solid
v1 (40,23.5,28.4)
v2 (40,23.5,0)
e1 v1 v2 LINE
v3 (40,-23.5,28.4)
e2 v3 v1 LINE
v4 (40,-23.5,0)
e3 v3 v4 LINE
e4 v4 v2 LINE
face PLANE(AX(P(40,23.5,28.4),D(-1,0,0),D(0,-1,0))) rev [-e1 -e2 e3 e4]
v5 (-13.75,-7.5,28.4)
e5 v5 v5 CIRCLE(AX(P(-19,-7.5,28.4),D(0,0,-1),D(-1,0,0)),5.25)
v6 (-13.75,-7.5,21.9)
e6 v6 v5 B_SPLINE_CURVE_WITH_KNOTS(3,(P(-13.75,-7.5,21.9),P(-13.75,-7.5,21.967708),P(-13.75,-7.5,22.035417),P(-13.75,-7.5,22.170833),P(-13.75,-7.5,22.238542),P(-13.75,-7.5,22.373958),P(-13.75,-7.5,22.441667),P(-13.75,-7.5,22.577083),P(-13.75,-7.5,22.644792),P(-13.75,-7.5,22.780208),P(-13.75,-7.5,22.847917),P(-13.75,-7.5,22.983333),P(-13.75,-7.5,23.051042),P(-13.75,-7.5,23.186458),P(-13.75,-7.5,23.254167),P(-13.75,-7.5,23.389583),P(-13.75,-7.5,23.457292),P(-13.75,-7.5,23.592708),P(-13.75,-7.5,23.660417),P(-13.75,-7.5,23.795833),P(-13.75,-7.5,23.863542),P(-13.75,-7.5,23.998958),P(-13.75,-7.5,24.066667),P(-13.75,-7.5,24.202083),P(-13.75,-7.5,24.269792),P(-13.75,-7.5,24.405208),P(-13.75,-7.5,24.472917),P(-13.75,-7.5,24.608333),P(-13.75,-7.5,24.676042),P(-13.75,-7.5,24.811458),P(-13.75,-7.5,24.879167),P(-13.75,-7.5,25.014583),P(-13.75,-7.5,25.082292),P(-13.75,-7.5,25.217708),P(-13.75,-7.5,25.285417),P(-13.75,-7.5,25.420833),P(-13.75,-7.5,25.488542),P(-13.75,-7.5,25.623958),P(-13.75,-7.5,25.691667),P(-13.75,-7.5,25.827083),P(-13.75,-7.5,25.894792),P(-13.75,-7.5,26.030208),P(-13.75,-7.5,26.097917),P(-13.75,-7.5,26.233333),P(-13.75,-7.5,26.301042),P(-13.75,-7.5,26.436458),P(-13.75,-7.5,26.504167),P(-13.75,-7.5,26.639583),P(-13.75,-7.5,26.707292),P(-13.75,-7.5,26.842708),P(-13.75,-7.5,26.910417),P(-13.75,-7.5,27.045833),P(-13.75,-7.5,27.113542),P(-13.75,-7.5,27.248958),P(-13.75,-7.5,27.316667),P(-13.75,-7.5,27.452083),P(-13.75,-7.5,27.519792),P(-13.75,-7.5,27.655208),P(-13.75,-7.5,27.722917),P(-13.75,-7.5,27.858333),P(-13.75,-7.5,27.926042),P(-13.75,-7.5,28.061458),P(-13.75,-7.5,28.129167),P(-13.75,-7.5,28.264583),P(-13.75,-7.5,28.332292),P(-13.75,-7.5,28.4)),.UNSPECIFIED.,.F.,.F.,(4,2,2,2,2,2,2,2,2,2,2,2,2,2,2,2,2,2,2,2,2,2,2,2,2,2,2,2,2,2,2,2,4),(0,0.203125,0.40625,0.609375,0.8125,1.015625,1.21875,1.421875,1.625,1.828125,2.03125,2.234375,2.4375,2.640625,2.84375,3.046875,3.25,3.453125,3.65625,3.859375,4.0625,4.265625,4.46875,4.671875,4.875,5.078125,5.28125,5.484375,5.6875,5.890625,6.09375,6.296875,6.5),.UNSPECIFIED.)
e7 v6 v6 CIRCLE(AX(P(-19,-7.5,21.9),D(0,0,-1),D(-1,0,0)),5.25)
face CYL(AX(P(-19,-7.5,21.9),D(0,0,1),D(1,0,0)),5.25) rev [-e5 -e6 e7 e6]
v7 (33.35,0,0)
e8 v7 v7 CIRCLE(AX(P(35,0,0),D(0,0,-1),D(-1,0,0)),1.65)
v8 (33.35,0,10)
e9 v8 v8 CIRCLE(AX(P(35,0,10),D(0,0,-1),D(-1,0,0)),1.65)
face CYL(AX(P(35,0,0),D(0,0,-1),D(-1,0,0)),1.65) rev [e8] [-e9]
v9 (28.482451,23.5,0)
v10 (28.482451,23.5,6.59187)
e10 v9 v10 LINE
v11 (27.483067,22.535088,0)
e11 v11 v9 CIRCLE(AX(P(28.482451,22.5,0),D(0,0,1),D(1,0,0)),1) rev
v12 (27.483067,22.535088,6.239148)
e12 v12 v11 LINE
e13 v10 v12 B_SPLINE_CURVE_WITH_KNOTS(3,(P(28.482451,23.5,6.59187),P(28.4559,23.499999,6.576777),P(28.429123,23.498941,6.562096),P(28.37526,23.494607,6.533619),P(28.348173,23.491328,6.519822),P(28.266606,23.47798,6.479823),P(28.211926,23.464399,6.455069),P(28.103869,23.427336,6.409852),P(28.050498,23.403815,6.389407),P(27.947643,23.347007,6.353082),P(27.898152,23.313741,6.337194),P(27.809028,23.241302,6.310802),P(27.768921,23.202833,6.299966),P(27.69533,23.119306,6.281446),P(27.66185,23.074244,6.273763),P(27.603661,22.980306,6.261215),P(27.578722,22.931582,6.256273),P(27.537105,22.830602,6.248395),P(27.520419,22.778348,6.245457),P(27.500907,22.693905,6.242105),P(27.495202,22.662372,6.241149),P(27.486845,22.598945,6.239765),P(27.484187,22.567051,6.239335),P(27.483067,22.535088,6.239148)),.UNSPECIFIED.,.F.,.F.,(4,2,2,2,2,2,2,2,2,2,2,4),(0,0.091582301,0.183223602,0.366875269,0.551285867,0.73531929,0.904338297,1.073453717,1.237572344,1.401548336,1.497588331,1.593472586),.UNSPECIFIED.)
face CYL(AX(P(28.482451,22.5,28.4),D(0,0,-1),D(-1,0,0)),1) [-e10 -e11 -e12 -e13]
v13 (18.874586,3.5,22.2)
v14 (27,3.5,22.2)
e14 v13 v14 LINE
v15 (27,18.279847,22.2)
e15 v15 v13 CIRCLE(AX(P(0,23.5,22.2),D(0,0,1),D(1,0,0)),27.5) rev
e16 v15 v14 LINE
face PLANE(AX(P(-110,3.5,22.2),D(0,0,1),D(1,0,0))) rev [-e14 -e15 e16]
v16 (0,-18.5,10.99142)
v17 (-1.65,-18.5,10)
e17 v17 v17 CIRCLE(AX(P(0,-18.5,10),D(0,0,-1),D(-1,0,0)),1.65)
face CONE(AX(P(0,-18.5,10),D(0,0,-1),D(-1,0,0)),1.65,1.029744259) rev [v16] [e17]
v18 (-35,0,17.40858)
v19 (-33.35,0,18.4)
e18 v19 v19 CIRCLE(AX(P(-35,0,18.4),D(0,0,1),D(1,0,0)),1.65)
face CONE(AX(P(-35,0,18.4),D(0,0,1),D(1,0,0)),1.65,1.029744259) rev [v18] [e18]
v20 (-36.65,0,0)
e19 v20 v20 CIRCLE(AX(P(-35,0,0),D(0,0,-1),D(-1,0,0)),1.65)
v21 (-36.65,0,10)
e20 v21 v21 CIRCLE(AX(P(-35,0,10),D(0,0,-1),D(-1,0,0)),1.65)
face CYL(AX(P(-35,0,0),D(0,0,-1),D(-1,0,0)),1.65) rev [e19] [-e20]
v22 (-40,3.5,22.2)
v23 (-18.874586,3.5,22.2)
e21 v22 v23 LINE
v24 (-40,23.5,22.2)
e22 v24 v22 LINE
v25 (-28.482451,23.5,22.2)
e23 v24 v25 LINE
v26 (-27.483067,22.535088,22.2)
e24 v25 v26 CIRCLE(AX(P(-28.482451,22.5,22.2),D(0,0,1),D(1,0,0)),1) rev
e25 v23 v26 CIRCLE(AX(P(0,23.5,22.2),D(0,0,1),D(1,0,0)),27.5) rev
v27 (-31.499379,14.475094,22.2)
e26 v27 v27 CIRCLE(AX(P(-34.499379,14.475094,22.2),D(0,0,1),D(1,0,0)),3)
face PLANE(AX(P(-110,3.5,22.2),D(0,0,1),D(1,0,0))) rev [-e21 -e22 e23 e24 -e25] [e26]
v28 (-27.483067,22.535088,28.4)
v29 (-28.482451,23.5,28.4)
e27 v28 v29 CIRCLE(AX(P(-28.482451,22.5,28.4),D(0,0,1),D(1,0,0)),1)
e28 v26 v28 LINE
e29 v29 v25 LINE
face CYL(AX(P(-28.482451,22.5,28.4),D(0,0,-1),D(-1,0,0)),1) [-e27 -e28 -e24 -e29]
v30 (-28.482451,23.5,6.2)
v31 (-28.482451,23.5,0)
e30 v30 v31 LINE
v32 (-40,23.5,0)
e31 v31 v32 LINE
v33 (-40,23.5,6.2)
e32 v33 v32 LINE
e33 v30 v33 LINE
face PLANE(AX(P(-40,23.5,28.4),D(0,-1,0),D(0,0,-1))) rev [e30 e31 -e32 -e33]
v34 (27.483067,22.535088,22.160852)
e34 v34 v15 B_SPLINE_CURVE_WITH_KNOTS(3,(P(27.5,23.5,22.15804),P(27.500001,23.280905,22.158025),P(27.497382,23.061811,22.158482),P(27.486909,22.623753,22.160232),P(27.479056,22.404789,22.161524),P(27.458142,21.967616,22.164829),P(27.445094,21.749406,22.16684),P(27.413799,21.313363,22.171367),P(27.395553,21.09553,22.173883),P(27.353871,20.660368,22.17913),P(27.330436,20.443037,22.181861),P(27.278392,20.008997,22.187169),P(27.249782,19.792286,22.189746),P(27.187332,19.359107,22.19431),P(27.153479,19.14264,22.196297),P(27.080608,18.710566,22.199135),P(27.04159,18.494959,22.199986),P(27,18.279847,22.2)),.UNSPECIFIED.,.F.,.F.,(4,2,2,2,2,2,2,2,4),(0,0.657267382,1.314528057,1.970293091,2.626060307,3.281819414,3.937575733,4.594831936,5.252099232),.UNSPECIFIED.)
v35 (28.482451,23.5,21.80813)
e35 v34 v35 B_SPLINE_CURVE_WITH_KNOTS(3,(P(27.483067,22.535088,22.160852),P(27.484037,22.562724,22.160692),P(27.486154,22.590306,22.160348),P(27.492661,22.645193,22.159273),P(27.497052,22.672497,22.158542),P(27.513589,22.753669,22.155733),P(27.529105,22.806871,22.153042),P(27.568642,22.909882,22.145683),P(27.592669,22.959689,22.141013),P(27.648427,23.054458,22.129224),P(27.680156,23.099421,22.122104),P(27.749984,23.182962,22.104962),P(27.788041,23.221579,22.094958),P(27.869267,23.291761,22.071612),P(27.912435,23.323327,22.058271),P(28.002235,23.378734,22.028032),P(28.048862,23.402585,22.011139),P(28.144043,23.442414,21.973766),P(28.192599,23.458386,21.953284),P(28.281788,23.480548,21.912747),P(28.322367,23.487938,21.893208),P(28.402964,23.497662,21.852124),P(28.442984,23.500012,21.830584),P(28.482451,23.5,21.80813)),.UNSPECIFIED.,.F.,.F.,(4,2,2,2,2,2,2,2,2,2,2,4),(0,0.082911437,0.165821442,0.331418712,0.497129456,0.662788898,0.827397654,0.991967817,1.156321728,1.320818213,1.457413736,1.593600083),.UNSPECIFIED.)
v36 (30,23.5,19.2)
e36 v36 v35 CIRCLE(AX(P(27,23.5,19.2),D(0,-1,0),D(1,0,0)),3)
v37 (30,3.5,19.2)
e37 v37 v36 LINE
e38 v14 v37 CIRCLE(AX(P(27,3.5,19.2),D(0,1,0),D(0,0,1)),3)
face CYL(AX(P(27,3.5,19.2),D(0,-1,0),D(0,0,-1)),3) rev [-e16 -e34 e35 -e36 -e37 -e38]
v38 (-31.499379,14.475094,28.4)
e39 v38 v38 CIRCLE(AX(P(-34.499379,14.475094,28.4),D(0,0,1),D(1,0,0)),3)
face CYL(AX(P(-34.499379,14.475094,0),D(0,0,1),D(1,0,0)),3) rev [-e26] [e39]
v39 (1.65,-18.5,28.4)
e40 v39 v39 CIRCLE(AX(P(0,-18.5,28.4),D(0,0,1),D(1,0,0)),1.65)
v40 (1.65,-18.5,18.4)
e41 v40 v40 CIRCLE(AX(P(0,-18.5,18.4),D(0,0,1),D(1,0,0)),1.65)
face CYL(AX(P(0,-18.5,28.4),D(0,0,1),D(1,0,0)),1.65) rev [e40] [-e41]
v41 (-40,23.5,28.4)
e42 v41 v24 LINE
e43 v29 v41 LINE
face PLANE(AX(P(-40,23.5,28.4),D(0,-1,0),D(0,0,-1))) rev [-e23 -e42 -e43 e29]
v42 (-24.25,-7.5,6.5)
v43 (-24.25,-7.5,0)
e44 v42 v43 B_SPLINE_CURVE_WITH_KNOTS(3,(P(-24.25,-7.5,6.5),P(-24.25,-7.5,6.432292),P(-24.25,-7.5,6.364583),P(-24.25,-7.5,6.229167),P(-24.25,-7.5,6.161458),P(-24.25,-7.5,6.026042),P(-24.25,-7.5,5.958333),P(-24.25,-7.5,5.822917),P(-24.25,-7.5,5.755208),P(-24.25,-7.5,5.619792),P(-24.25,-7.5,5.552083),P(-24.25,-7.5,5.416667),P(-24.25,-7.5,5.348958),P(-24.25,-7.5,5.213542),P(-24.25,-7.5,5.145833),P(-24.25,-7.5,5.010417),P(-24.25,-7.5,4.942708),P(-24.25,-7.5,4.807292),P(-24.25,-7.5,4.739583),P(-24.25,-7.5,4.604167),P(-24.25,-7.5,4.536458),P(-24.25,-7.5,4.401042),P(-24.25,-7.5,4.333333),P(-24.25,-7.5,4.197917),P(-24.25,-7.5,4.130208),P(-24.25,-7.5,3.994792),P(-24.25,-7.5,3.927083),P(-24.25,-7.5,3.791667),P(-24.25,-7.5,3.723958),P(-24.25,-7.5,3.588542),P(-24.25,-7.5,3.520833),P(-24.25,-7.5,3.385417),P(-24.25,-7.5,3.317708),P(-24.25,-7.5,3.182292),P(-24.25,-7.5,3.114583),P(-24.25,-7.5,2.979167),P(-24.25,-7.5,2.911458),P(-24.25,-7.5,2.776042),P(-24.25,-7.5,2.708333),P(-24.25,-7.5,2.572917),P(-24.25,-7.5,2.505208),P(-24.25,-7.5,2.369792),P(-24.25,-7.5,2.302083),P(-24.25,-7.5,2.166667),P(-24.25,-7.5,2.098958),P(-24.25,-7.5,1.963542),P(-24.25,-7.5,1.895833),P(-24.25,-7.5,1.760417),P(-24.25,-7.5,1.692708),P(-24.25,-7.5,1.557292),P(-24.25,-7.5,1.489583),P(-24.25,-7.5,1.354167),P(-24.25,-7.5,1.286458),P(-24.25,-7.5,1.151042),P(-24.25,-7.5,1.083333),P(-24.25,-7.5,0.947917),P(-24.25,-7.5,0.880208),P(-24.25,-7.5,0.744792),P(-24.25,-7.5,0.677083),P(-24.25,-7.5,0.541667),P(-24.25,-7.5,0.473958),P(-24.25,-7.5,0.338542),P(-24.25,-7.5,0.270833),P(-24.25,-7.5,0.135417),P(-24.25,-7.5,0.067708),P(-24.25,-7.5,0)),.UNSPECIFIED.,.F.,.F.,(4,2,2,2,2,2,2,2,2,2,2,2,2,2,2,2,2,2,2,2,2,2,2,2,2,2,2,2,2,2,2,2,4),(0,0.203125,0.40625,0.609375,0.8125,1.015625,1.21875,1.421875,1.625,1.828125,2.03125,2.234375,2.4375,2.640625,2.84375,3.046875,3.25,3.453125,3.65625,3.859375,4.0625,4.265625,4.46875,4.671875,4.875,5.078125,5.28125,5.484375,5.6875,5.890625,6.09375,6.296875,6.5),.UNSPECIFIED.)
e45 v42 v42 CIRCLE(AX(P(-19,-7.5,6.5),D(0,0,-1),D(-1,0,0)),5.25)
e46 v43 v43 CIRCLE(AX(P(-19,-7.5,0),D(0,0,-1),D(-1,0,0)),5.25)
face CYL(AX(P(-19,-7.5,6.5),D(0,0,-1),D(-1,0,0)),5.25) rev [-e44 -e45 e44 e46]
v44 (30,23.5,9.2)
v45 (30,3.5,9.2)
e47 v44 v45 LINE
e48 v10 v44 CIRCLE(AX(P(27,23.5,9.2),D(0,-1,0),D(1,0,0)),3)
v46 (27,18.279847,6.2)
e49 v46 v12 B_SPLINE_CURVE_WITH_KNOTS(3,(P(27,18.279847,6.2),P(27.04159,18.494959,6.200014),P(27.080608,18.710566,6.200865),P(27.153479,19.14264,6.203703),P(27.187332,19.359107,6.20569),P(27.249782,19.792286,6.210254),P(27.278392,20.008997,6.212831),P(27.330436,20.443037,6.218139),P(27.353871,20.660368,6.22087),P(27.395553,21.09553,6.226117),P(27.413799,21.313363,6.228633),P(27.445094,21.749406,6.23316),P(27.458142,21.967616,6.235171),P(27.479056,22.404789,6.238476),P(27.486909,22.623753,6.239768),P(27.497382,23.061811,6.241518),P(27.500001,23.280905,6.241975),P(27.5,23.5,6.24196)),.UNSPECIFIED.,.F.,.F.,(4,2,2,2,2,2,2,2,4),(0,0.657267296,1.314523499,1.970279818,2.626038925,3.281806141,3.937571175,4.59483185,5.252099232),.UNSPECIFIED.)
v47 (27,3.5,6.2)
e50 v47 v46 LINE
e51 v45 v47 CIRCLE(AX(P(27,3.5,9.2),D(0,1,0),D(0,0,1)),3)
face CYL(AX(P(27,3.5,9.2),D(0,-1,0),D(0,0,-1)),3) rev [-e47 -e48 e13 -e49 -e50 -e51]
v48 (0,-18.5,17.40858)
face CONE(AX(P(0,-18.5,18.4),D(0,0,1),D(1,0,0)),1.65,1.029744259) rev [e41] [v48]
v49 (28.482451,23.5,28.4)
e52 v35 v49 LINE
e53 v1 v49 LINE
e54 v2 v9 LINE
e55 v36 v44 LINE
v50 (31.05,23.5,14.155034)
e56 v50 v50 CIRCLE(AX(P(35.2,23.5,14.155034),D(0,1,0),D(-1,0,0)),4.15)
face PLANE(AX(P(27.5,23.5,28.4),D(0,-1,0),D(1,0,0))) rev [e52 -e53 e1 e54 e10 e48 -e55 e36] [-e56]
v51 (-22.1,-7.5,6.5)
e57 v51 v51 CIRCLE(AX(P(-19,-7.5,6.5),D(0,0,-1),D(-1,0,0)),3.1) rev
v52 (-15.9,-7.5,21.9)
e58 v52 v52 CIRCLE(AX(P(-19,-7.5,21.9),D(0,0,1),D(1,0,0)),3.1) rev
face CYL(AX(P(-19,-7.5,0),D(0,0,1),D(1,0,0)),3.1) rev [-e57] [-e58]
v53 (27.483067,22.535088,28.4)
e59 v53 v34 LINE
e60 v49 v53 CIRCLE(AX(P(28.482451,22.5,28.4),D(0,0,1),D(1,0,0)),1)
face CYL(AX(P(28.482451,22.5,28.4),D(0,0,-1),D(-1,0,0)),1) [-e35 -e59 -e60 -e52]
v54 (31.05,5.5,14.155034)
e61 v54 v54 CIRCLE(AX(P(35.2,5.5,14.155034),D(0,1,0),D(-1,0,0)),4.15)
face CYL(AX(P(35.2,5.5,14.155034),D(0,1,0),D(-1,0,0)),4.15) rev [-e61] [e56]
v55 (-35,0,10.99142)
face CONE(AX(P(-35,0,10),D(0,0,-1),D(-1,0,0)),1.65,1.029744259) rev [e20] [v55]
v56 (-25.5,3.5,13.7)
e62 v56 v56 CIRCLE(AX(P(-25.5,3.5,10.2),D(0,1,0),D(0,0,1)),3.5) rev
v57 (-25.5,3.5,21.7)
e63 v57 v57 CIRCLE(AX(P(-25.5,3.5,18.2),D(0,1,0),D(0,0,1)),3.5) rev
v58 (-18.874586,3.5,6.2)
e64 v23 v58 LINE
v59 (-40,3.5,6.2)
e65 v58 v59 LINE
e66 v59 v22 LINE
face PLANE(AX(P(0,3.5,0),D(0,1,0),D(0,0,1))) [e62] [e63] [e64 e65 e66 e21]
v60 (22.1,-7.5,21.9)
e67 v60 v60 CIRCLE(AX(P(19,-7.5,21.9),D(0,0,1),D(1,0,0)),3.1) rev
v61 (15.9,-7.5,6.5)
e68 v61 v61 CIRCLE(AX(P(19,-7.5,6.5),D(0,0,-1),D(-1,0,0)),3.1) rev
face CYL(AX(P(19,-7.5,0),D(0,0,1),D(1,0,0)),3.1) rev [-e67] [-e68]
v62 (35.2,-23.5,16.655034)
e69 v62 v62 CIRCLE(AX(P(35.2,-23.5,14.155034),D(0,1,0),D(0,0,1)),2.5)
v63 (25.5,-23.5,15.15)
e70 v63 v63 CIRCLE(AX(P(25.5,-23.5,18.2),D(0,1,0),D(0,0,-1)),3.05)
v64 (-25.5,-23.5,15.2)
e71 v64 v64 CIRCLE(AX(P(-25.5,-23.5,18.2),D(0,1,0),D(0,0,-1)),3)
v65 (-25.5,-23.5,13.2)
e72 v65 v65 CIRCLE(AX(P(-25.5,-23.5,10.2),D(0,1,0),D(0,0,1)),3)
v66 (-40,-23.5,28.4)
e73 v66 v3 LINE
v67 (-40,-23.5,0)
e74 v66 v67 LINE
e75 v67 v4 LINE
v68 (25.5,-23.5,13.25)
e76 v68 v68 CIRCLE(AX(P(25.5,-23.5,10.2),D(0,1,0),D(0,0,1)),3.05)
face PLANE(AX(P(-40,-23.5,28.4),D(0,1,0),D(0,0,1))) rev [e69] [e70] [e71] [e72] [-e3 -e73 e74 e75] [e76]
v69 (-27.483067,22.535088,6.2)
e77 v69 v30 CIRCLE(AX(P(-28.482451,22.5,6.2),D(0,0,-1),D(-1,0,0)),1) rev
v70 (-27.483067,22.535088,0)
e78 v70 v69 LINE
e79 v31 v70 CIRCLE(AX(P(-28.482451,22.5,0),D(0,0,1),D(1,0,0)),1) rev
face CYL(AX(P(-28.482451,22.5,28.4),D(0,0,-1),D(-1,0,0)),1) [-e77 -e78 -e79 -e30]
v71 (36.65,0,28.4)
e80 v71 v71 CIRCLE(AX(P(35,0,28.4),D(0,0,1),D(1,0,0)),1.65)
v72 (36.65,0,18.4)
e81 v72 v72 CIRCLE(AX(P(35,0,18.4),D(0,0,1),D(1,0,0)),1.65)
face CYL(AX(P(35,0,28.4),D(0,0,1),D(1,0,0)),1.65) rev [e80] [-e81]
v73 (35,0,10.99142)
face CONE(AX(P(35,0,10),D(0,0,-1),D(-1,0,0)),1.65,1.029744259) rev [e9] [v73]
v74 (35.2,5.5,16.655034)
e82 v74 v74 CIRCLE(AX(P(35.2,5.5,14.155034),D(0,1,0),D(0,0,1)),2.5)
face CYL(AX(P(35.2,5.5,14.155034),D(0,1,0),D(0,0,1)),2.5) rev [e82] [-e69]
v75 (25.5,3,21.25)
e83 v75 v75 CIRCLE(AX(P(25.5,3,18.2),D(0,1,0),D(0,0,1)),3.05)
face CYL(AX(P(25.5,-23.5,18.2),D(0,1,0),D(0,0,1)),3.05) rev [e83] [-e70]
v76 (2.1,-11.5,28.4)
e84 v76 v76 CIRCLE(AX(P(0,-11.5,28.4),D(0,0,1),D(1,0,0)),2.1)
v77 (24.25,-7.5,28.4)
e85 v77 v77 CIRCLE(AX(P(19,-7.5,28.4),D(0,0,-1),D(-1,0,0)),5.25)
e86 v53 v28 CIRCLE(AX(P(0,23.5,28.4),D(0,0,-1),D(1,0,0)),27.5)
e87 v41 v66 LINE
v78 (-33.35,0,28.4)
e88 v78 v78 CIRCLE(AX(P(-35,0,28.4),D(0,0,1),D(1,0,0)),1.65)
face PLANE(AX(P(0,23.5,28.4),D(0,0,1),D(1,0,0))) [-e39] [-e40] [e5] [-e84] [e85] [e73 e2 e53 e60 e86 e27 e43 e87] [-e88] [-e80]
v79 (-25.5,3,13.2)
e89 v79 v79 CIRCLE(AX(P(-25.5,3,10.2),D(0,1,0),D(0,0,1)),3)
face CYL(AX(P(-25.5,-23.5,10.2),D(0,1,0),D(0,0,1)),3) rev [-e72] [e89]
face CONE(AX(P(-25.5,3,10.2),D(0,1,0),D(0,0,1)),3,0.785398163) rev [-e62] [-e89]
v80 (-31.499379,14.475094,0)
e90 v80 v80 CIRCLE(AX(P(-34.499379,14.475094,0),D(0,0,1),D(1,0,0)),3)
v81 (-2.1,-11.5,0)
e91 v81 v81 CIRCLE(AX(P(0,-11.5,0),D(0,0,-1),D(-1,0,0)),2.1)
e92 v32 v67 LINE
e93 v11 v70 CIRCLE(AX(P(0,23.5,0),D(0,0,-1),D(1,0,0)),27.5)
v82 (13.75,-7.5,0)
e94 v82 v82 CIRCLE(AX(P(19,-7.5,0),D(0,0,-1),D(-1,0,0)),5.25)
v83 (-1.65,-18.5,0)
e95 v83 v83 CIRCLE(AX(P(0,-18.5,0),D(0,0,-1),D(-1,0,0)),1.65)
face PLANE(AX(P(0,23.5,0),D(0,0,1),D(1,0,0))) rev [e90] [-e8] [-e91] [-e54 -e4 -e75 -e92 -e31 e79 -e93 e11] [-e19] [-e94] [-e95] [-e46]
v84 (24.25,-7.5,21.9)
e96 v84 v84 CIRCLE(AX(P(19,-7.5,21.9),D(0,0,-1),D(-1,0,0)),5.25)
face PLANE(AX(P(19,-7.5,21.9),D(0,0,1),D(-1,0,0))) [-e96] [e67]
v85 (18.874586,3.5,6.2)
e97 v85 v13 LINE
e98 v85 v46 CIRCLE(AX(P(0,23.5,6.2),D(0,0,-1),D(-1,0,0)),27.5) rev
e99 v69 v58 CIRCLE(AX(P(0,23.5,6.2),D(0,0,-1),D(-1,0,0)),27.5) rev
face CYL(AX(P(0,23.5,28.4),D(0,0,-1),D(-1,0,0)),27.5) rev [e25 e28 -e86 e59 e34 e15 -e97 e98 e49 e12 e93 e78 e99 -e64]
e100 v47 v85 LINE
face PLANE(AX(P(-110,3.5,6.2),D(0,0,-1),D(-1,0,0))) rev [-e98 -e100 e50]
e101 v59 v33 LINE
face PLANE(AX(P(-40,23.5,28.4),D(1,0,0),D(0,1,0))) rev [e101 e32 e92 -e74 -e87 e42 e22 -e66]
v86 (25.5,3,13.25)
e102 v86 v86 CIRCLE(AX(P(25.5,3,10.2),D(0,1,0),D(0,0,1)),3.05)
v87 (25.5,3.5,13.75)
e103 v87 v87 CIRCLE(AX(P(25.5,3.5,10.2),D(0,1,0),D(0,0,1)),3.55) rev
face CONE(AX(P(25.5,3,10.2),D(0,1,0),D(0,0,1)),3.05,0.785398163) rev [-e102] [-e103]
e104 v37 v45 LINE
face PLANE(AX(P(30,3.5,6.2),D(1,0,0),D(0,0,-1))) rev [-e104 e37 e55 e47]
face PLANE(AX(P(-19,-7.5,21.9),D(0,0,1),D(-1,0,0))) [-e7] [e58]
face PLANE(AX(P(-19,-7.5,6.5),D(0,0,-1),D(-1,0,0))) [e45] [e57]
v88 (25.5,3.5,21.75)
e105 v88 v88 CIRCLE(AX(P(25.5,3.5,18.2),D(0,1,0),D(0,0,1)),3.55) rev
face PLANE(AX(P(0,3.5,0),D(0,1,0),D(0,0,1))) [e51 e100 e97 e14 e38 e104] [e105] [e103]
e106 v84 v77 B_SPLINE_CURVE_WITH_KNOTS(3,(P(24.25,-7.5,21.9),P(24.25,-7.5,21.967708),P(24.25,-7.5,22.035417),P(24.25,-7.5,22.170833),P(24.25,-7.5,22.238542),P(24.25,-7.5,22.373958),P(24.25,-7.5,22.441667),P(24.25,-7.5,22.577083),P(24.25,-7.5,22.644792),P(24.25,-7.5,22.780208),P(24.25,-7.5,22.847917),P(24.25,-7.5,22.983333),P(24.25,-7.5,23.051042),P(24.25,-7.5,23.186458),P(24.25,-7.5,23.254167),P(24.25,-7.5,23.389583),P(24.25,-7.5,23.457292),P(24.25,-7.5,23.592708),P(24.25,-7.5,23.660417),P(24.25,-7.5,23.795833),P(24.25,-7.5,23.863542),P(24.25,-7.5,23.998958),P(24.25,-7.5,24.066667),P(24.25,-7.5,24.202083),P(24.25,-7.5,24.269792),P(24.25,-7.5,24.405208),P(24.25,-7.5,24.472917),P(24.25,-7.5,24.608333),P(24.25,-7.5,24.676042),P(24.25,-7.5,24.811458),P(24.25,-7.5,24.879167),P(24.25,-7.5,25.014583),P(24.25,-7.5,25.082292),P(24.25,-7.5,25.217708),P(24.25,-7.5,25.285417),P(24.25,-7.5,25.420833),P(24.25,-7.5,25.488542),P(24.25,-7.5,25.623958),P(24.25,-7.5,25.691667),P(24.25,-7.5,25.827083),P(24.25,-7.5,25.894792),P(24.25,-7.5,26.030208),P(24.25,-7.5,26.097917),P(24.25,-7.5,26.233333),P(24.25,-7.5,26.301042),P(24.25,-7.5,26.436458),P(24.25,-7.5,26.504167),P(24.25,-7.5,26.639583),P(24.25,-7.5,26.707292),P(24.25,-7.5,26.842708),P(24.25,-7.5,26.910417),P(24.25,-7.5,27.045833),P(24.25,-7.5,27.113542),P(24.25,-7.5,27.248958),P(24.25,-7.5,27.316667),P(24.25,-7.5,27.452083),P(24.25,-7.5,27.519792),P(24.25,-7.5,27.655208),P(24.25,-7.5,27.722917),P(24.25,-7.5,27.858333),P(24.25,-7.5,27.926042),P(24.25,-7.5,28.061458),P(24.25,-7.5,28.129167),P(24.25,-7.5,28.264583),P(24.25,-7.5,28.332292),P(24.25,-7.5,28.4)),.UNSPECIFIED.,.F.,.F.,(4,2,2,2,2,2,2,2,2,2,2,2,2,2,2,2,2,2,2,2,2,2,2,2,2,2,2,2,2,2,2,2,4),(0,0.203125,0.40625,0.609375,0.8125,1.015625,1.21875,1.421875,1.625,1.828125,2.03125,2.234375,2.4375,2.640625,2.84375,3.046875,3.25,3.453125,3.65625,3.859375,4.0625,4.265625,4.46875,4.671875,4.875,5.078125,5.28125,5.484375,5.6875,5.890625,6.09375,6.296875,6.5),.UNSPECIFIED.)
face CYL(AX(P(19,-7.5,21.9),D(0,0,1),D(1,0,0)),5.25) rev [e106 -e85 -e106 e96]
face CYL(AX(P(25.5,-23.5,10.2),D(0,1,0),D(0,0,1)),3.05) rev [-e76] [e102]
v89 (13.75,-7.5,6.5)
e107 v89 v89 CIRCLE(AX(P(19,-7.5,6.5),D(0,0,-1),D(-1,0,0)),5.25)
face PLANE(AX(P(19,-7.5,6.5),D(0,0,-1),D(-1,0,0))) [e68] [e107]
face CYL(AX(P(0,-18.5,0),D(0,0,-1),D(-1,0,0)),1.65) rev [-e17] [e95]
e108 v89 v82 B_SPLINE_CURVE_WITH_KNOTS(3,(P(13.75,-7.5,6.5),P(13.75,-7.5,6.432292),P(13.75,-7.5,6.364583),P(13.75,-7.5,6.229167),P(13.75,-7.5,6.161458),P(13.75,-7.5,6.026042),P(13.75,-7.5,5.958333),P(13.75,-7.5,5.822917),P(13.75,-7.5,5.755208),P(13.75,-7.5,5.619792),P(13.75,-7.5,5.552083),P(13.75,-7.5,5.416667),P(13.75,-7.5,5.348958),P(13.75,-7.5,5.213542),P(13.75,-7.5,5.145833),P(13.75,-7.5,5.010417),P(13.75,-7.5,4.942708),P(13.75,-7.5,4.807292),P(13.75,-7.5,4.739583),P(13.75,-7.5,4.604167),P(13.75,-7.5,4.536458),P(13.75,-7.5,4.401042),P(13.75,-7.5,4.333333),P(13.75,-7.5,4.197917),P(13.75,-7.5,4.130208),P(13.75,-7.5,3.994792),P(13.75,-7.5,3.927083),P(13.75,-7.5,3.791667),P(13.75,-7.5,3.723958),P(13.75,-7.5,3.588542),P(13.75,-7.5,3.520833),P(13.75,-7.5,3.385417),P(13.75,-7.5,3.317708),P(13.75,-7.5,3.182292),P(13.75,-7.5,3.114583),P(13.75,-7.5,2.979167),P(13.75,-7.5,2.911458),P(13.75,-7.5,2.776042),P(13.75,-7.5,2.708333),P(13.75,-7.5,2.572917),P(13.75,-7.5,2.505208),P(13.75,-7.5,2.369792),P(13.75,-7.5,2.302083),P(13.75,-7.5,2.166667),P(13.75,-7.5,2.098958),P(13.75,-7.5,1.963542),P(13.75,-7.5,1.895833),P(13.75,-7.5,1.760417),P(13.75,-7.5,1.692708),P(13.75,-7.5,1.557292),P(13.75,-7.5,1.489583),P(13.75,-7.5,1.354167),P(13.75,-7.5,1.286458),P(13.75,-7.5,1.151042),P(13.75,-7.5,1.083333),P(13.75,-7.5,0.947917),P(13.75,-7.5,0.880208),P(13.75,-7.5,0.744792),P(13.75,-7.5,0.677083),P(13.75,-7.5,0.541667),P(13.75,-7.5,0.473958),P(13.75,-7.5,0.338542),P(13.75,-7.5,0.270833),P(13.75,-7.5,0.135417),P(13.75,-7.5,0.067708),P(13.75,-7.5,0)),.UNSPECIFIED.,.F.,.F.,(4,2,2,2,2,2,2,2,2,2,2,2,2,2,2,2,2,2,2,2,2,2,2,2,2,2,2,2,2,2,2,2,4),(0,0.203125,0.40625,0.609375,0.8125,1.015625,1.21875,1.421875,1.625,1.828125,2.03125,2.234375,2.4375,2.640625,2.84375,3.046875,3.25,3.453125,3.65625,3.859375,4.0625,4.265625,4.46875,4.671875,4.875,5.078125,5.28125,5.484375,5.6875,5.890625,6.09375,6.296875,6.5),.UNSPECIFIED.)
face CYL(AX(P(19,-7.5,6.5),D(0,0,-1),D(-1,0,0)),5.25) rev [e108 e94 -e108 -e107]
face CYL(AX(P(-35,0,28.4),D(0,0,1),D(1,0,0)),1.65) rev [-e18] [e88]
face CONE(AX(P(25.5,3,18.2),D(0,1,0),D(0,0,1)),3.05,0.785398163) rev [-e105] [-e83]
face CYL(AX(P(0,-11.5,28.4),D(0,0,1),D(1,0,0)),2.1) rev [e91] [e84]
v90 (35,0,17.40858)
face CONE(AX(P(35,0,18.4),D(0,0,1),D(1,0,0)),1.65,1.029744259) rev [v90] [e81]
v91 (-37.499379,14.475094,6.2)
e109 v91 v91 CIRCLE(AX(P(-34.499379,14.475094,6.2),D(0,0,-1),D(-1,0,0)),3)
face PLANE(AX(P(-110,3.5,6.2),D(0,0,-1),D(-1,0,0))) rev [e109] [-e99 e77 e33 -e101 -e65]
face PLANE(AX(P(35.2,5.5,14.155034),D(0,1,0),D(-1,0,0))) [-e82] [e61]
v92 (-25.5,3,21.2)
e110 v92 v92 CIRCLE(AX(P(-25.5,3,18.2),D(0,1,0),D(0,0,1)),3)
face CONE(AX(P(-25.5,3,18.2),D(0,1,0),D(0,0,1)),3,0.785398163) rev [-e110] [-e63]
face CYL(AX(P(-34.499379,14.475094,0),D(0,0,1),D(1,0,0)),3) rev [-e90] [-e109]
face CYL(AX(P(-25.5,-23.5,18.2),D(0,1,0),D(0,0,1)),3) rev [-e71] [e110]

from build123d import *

# Parameters (mm, degrees)
EXTRUDE_1_DEPTH             = 28.4
SKETCH_2_W                  = 140
SKETCH_2_H                  = 16
CUT_EXTRUDE_1_DEPTH         = 20
FILLET_1_R                  = 3
SKETCH_3_R                  = 3
SKETCH_3_R_2                = 3.05
CUT_EXTRUDE_2_DEPTH         = 56.996071341
CHAMFER_1_SIZE              = 0.5
SKETCH_4_R                  = 3
CUT_EXTRUDE_3_DEPTH         = 55.394944713
SKETCH_7_R                  = 4.15
CUT_EXTRUDE_4_DEPTH         = 18
HOLE_WIZARD_M6_2_D          = 5
SKETCH_10_R                 = 3.1
CUT_EXTRUDE_5_DEPTH         = 55.394944713
HOLE_WIZARD_M5_1_D          = 4.2
HOLE_WIZARD_M5_1_DEPTH      = 14.4
HOLE_WIZARD_M5_1_TIP        = 1.2618073
HOLE_WIZARD_M5_2_D          = 4.2
HOLE_WIZARD_M5_2_DEPTH      = 14.4
HOLE_WIZARD_M5_2_TIP        = 1.2618073
FILLET_2_R                  = 1
SKETCH_17_R                 = 5.25
CUT_EXTRUDE_7_DEPTH         = 6.5
HOLE_WIZARD_M4_1_AT_2_COUNT = 2
HOLE_WIZARD_M4_1_AT_2_PITCH = 70
HOLE_WIZARD_M4_1_AT_3_COUNT = 2
HOLE_WIZARD_M4_1_AT_3_PITCH = 39.588508434


with BuildPart() as part:
    # 草图1 → 凸台-拉伸1 (new body)
    with BuildSketch(Plane.XY):
        with BuildLine():
            Line((27.5, 23.5), (40, 23.5))
            Line((40, 23.5), (40, -23.5))
            Line((40, -23.5), (-40, -23.5))
            Line((-40, -23.5), (-40, 23.5))
            Line((-40, 23.5), (-27.5, 23.5))
            ThreePointArc((-27.5, 23.5), (0, -4), (27.5, 23.5))
        make_face()
    extrude(amount=EXTRUDE_1_DEPTH)

    # 草图2 → 切除-拉伸1 (cut)
    with BuildSketch(Plane(origin=(0, 23.5, 0), x_dir=(1, 0, 0), z_dir=(0, 1, 0))):
        with Locations((-40, -14.2)):
            Rectangle(SKETCH_2_W, SKETCH_2_H)
    extrude(amount=-CUT_EXTRUDE_1_DEPTH, mode=Mode.SUBTRACT)

    # 圆角1
    # the kernel refuses this fillet: 3 mm, written as the material it adds along each edge
    with BuildSketch(Plane(origin=(30, 23.5, 22.2), x_dir=(-1, 0, 0), z_dir=(0, -1, 0))) as fillet_1_piece_1_section:
        with BuildLine():
            CenterArc((FILLET_1_R, FILLET_1_R), FILLET_1_R, 180, 90)
            Line((0, FILLET_1_R), (0, 0))
            Line((0, 0), (FILLET_1_R, 0))
        make_face()
    fillet_1_piece_1 = extrude(amount=27.5, mode=Mode.PRIVATE)
    fillet_1_piece_1 = fillet_1_piece_1 - Plane(origin=(0, 23.5, 21.518950585), x_dir=(-1, 0, 0), z_dir=(0, 0, -1)) * Cylinder(27.5, 67, mode=Mode.PRIVATE)
    add(fillet_1_piece_1)
    with BuildSketch(Plane(origin=(30, 23.5, 6.2), x_dir=(0, 0, 1), z_dir=(0, -1, 0))) as fillet_1_piece_2_section:
        with BuildLine():
            CenterArc((FILLET_1_R, FILLET_1_R), FILLET_1_R, 180, 90)
            Line((0, FILLET_1_R), (0, 0))
            Line((0, 0), (FILLET_1_R, 0))
        make_face()
    fillet_1_piece_2 = extrude(amount=27.5, mode=Mode.PRIVATE)
    fillet_1_piece_2 = fillet_1_piece_2 - Plane(origin=(0, 23.5, 6.881049416), x_dir=(-1, 0, 0), z_dir=(0, 0, -1)) * Cylinder(27.5, 68, mode=Mode.PRIVATE)
    add(fillet_1_piece_2)

    # 草图3 → 切除-拉伸2 (cut, through all)
    with BuildSketch(Plane(origin=(0, 3.5, 0), x_dir=(1, 0, 0), z_dir=(0, 1, 0))):
        with Locations(Location((-25.5, -10.2, 0), (0, 0, 270))):
            Circle(SKETCH_3_R)
        with Locations(Location((-25.5, -18.2, 0), (0, 0, 90))):
            Circle(SKETCH_3_R)
        with Locations(Location((25.5, -10.2, 0), (0, 0, 270))):
            Circle(SKETCH_3_R_2)
        with Locations(Location((25.5, -18.2, 0), (0, 0, 90))):
            Circle(SKETCH_3_R_2)
    extrude(amount=-CUT_EXTRUDE_2_DEPTH, mode=Mode.SUBTRACT)

    # 倒角1
    chamfer_1_edges = [part.edges().sort_by_distance(p)[0] for p in [
        (-25.5, 3.5, 7.2),
        (-25.5, 3.5, 21.2),
        (25.5, 3.5, 7.15),
        (25.5, 3.5, 21.25),
    ]]
    chamfer(chamfer_1_edges, length=CHAMFER_1_SIZE)

    # 草图4 → 切除-拉伸3 (cut, through all)
    with BuildSketch(Plane.XY.offset(28.4)):
        with Locations((-34.499379308, 14.475094051)):
            Circle(SKETCH_4_R)
    extrude(amount=-CUT_EXTRUDE_3_DEPTH, mode=Mode.SUBTRACT)

    # 草图7 → 切除-拉伸4 (cut)
    with BuildSketch(Plane(origin=(0, 23.5, 0), x_dir=(1, 0, 0), z_dir=(0, 1, 0))):
        with Locations(Location((35.2, -14.155033758, 0), (0, 0, 180))):
            Circle(SKETCH_7_R)
    extrude(amount=-CUT_EXTRUDE_4_DEPTH, mode=Mode.SUBTRACT)

    # M6 螺纹孔2 (through all)
    with Locations(Plane(origin=(0, 5.5, 0), x_dir=(1, 0, 0), z_dir=(0, 1, 0))):
        with Locations((35.2, -14.155033758)):
            Hole(HOLE_WIZARD_M6_2_D / 2)

    # 草图10 → 切除-拉伸5 (cut, through all)
    with BuildSketch(Plane.XY.offset(28.4)):
        with Locations((-19, -7.5)):
            Circle(SKETCH_10_R)
        with Locations(Location((19, -7.5, 0), (0, 0, 180))):
            Circle(SKETCH_10_R)
    extrude(amount=-CUT_EXTRUDE_5_DEPTH, mode=Mode.SUBTRACT)

    # M5 螺纹孔1
    with Locations(Plane.XY.offset(28.4)):
        with Locations((0, -11.5)):
            Hole(HOLE_WIZARD_M5_1_D / 2, depth=HOLE_WIZARD_M5_1_DEPTH)
            with Locations((0, 0, -(HOLE_WIZARD_M5_1_DEPTH + HOLE_WIZARD_M5_1_TIP / 2))):  # 118° drill point
                Cone(0, HOLE_WIZARD_M5_1_D / 2, HOLE_WIZARD_M5_1_TIP, mode=Mode.SUBTRACT)

    # M5 螺纹孔2
    with Locations(Plane(origin=(0, 0, 0), x_dir=(-1, 0, 0), z_dir=(0, 0, -1))):
        with Locations((0, -11.5)):
            Hole(HOLE_WIZARD_M5_2_D / 2, depth=HOLE_WIZARD_M5_2_DEPTH)
            with Locations((0, 0, -(HOLE_WIZARD_M5_2_DEPTH + HOLE_WIZARD_M5_2_TIP / 2))):  # 118° drill point
                Cone(0, HOLE_WIZARD_M5_2_D / 2, HOLE_WIZARD_M5_2_TIP, mode=Mode.SUBTRACT)

    # 圆角2
    fillet_2_edges = [part.edges().sort_by_distance(p)[0] for p in [
        (27.5, 23.5, 25.279019946),
        (27.5, 23.5, 3.120980054),
        (-27.5, 23.5, 25.3),
        (-27.5, 23.5, 3.1),
    ]]
    fillet(fillet_2_edges, radius=FILLET_2_R)

    # 草图17 → 切除-拉伸7 (cut)
    with BuildSketch(Plane(origin=(0, 0, 0), x_dir=(-1, 0, 0), z_dir=(0, 0, -1))):
        with Locations((-19, -7.5)):
            Circle(SKETCH_17_R)
        with Locations((19, -7.5)):
            Circle(SKETCH_17_R)
    cut_extrude_7 = extrude(amount=-CUT_EXTRUDE_7_DEPTH, mode=Mode.SUBTRACT)

    # 镜向3: 切除-拉伸7 across plane
    add(cut_extrude_7.mirror(Plane.XY.offset(14.2)), mode=Mode.SUBTRACT)

    # 草图18 → M4 螺纹孔1 (revolve, cut)
    with BuildSketch(Plane(origin=(-35, 0, 28.4), x_dir=(0, -1, 0), z_dir=(1, 0, 0))):
        Polygon((0, 0), (0, 10.991420021), (1.65, 10), (1.65, 0), align=None)
    hole_wizard_m4_1 = revolve(axis=Axis((-35, 0, 34.75), (0, 0, -1)), mode=Mode.SUBTRACT)

    # M4 螺纹孔1 at 2: M4 螺纹孔1 ×2
    with Locations(*[(i * HOLE_WIZARD_M4_1_AT_2_PITCH, 0, 0) for i in range(1, HOLE_WIZARD_M4_1_AT_2_COUNT)]):
        add(hole_wizard_m4_1, mode=Mode.SUBTRACT)

    # M4 螺纹孔1 at 3: M4 螺纹孔1 ×2
    with Locations(*[Vector(0.8840949402949304, -0.46730732558446325, 0) * (i * HOLE_WIZARD_M4_1_AT_3_PITCH) for i in range(1, HOLE_WIZARD_M4_1_AT_3_COUNT)]):
        add(hole_wizard_m4_1, mode=Mode.SUBTRACT)

    # 镜向4: M4 螺纹孔1 across plane
    add(hole_wizard_m4_1.mirror(Plane.XY.offset(14.2)), mode=Mode.SUBTRACT)

    # 镜向4 copy 1 sketch → 镜向4 copy 1 (revolve, cut)
    with BuildSketch(Plane(origin=(35, 0, 0), x_dir=(0, -1, 0), z_dir=(1, 0, 0))):
        Polygon((0, 0), (0, -10.991420021), (1.65, -10), (1.65, 0), align=None)
    revolve(axis=Axis((35, 0, -6.35), (0, 0, -1)), mode=Mode.SUBTRACT)

    # 镜向4 copy 2 sketch → 镜向4 copy 2 (revolve, cut)
    with BuildSketch(Plane(origin=(0, -18.5, 0), x_dir=(0, -1, 0), z_dir=(1, 0, 0))):
        Polygon((0, 0), (0, -10.991420021), (1.65, -10), (1.65, 0), align=None)
    revolve(axis=Axis((0, -18.5, -6.35), (0, 0, -1)), mode=Mode.SUBTRACT)


solid = part.part
